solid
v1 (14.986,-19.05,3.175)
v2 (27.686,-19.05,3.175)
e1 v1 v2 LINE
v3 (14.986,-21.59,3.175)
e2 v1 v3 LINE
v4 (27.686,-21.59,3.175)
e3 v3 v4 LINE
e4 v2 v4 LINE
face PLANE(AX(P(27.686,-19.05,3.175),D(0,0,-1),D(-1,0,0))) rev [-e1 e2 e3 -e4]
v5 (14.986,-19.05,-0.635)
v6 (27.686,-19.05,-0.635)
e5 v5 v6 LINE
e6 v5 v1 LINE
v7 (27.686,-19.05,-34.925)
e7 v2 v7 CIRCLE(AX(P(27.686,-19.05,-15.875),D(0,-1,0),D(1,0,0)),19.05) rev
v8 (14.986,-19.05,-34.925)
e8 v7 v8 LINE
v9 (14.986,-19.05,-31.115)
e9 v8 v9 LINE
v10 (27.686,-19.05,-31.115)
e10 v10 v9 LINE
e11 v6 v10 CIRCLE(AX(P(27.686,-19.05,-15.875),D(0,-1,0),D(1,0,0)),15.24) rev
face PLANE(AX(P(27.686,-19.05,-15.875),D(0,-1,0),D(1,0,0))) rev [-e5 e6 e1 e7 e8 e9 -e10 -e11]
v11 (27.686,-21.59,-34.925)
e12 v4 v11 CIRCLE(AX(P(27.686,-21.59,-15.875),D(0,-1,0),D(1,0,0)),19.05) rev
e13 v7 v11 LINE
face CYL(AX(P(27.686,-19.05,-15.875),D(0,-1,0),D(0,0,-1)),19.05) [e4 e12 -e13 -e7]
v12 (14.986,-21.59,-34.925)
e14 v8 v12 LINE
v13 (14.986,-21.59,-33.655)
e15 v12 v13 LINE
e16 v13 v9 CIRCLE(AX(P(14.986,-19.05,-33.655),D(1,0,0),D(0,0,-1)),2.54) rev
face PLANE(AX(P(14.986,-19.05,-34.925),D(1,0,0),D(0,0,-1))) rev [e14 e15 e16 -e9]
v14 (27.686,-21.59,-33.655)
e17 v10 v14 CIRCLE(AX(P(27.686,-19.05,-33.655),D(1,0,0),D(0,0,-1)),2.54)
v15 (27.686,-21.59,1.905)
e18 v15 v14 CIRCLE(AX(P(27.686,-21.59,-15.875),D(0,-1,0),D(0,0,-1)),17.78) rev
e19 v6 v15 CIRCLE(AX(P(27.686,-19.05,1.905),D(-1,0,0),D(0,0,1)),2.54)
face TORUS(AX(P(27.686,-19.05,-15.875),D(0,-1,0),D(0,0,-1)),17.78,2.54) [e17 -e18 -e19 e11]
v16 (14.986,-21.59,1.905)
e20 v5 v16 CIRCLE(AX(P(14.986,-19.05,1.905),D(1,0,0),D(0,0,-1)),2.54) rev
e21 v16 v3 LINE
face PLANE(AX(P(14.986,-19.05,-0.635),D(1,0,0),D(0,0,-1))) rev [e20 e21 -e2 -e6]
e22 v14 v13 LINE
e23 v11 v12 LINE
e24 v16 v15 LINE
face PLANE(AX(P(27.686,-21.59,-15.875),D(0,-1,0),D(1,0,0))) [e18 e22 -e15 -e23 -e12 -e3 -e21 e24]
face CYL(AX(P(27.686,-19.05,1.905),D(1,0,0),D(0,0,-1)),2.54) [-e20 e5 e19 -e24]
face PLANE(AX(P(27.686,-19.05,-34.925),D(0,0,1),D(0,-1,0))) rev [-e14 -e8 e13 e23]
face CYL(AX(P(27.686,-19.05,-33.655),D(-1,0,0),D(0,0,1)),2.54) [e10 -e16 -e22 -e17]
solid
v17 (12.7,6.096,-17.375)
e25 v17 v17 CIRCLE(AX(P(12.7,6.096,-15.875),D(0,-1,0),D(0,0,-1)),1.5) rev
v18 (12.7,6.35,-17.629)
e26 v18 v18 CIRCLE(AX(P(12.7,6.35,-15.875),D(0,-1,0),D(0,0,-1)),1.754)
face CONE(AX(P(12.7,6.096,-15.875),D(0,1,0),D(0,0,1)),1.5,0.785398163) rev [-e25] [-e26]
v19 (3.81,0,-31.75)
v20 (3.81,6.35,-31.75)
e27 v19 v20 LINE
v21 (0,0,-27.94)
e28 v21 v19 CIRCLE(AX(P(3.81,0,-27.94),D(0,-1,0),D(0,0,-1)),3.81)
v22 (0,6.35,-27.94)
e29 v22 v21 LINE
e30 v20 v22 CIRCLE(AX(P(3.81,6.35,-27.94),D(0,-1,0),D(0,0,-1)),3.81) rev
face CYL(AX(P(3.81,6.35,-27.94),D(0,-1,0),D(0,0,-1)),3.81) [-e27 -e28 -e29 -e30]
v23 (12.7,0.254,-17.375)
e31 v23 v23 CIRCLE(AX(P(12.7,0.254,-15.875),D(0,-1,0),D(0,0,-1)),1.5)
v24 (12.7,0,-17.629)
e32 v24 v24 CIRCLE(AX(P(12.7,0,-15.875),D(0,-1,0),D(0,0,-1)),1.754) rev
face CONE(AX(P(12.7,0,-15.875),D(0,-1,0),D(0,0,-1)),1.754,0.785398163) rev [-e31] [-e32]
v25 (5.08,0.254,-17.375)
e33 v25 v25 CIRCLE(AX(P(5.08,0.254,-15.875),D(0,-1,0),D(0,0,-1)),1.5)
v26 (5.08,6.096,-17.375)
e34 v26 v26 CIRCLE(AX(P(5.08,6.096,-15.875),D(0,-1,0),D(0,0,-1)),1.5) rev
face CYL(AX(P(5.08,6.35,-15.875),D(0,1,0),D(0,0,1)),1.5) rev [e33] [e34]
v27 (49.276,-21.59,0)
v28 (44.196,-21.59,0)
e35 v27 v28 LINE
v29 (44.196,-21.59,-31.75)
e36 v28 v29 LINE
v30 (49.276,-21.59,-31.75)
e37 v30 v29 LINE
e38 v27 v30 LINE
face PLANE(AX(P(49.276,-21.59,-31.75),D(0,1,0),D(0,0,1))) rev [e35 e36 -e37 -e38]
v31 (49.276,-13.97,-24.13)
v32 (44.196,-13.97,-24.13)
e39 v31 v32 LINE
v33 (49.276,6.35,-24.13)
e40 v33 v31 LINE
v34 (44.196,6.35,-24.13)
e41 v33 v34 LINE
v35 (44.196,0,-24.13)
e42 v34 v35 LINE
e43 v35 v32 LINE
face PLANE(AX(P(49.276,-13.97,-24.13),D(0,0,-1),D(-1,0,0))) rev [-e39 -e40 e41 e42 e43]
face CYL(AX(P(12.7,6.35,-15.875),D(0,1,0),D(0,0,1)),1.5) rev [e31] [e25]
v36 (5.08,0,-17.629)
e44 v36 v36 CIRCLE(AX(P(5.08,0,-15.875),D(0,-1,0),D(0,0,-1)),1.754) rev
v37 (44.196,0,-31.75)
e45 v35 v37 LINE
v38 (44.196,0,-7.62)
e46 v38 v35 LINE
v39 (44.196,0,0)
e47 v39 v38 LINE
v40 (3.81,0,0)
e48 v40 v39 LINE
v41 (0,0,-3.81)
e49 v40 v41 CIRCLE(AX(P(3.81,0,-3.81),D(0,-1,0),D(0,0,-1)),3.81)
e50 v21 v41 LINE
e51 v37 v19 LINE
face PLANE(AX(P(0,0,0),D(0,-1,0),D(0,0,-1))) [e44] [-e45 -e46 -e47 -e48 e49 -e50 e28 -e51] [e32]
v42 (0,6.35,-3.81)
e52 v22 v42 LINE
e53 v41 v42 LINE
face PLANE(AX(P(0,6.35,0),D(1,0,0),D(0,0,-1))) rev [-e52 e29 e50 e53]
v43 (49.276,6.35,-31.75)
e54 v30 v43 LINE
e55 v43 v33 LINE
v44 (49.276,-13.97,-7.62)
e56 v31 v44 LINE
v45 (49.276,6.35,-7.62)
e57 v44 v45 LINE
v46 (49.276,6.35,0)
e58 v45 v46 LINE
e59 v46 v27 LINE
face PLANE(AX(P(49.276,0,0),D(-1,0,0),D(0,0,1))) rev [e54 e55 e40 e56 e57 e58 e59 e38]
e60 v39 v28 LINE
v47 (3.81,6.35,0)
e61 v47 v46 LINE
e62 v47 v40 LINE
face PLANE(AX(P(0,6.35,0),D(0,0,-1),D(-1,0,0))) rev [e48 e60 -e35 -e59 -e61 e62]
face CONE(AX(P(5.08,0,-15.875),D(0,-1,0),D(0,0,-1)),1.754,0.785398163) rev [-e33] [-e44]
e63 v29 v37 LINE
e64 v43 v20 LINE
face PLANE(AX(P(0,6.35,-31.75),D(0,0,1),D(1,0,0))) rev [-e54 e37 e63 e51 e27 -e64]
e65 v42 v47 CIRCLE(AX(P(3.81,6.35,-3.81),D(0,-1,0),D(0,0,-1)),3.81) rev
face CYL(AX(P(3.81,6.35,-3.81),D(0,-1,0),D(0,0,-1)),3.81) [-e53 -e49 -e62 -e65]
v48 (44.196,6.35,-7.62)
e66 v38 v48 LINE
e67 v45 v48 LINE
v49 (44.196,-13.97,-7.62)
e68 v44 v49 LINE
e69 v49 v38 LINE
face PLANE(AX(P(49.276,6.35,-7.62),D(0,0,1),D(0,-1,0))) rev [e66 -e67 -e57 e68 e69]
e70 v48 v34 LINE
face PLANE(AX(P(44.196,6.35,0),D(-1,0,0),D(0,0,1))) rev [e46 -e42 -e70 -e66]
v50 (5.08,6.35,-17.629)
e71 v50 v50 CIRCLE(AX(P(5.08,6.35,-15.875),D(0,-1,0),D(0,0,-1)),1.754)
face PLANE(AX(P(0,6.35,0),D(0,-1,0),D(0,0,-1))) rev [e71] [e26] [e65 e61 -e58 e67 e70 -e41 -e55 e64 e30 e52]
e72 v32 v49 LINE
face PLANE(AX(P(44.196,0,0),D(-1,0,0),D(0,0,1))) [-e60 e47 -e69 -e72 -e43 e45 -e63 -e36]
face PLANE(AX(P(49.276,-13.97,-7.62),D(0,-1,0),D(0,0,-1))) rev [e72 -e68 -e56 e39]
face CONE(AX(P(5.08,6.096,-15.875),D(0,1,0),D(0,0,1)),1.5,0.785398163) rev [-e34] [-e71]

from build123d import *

# Parameters (mm, degrees)
SKETCH1_W             = 44.196
SKETCH1_H             = 31.75
BOSS_EXTRUDE1_DEPTH   = 6.35
F_3_0MM_DOWEL_HOLE1_D = 3
CHAMFER1_SIZE         = 0.254
FILLET2_R             = 3.81
BOSS_EXTRUDE4_DEPTH   = 5.08
EXTRUDE_THIN1_DEPTH   = 2.54
FILLET3_R             = 2.54


with BuildPart() as part:
    # Sketch1 → Boss-Extrude1 (new body)
    with BuildSketch(Plane(origin=(0, 0, 0), x_dir=(1, 0, 0), z_dir=(0, 1, 0))):
        with Locations((22.098, 15.875)):
            Rectangle(SKETCH1_W, SKETCH1_H)
    extrude(amount=BOSS_EXTRUDE1_DEPTH)

    # Ø3.0mm Dowel Hole1 (through all)
    with Locations(Plane(origin=(0, 6.35, 0), x_dir=(1, 0, 0), z_dir=(0, 1, 0))):
        with Locations((5.08, 15.875), (12.7, 15.875)):
            Hole(F_3_0MM_DOWEL_HOLE1_D / 2)

    # Chamfer1
    chamfer1_edges = [part.edges().sort_by_distance(p)[0] for p in [
        (14.2, 6.35, -15.875),
        (14.2, 0, -15.875),
        (6.58, 6.35, -15.875),
        (6.58, 0, -15.875),
    ]]
    chamfer(chamfer1_edges, length=CHAMFER1_SIZE)

    # Fillet2
    fillet2_edges = [part.edges().sort_by_distance(p)[0] for p in [
        (0, 3.175, -31.75),
        (0, 3.175, 0),
    ]]
    fillet(fillet2_edges, radius=FILLET2_R)

    # Sketch6 → Boss-Extrude4 (add)
    with BuildSketch(Plane(origin=(44.196, 0, 0), x_dir=(0, 0, -1), z_dir=(1, 0, 0))):
        Polygon((0, 6.35), (0, -21.59), (31.75, -21.59), (31.75, 6.35), (24.13, 6.35), (24.13, -13.97), (7.62, -13.97), (7.62, 6.35), align=None)
    extrude(amount=BOSS_EXTRUDE4_DEPTH)


with BuildPart() as body_2:
    # Sketch8 → Extrude-Thin1 (new body)
    with BuildSketch(Plane.XZ.offset(21.59)):
        with BuildLine():
            Line((14.986, -34.925), (27.686, -34.925))
            ThreePointArc((27.686, -34.925), (46.736, -15.875), (27.686, 3.175))
            Line((27.686, 3.175), (14.986, 3.175))
            Line((14.986, 3.175), (14.986, -0.635))
            Line((14.986, -0.635), (27.686, -0.635))
            ThreePointArc((27.686, -0.635), (42.926, -15.875), (27.686, -31.115))
            Line((27.686, -31.115), (14.986, -31.115))
            Line((14.986, -31.115), (14.986, -34.925))
        make_face()
    extrude(amount=-EXTRUDE_THIN1_DEPTH)

    # Fillet3
    fillet3_edges = [body_2.edges().sort_by_distance(p)[0] for p in [
        (21.336, -21.59, -0.635),
        (21.336, -21.59, -31.115),
        (42.926, -21.59, -15.875),
    ]]
    fillet(fillet3_edges, radius=FILLET3_R - 0.0001)  # a hair under: the kernel refuses the full size


solid = Compound([part.part, body_2.part])
